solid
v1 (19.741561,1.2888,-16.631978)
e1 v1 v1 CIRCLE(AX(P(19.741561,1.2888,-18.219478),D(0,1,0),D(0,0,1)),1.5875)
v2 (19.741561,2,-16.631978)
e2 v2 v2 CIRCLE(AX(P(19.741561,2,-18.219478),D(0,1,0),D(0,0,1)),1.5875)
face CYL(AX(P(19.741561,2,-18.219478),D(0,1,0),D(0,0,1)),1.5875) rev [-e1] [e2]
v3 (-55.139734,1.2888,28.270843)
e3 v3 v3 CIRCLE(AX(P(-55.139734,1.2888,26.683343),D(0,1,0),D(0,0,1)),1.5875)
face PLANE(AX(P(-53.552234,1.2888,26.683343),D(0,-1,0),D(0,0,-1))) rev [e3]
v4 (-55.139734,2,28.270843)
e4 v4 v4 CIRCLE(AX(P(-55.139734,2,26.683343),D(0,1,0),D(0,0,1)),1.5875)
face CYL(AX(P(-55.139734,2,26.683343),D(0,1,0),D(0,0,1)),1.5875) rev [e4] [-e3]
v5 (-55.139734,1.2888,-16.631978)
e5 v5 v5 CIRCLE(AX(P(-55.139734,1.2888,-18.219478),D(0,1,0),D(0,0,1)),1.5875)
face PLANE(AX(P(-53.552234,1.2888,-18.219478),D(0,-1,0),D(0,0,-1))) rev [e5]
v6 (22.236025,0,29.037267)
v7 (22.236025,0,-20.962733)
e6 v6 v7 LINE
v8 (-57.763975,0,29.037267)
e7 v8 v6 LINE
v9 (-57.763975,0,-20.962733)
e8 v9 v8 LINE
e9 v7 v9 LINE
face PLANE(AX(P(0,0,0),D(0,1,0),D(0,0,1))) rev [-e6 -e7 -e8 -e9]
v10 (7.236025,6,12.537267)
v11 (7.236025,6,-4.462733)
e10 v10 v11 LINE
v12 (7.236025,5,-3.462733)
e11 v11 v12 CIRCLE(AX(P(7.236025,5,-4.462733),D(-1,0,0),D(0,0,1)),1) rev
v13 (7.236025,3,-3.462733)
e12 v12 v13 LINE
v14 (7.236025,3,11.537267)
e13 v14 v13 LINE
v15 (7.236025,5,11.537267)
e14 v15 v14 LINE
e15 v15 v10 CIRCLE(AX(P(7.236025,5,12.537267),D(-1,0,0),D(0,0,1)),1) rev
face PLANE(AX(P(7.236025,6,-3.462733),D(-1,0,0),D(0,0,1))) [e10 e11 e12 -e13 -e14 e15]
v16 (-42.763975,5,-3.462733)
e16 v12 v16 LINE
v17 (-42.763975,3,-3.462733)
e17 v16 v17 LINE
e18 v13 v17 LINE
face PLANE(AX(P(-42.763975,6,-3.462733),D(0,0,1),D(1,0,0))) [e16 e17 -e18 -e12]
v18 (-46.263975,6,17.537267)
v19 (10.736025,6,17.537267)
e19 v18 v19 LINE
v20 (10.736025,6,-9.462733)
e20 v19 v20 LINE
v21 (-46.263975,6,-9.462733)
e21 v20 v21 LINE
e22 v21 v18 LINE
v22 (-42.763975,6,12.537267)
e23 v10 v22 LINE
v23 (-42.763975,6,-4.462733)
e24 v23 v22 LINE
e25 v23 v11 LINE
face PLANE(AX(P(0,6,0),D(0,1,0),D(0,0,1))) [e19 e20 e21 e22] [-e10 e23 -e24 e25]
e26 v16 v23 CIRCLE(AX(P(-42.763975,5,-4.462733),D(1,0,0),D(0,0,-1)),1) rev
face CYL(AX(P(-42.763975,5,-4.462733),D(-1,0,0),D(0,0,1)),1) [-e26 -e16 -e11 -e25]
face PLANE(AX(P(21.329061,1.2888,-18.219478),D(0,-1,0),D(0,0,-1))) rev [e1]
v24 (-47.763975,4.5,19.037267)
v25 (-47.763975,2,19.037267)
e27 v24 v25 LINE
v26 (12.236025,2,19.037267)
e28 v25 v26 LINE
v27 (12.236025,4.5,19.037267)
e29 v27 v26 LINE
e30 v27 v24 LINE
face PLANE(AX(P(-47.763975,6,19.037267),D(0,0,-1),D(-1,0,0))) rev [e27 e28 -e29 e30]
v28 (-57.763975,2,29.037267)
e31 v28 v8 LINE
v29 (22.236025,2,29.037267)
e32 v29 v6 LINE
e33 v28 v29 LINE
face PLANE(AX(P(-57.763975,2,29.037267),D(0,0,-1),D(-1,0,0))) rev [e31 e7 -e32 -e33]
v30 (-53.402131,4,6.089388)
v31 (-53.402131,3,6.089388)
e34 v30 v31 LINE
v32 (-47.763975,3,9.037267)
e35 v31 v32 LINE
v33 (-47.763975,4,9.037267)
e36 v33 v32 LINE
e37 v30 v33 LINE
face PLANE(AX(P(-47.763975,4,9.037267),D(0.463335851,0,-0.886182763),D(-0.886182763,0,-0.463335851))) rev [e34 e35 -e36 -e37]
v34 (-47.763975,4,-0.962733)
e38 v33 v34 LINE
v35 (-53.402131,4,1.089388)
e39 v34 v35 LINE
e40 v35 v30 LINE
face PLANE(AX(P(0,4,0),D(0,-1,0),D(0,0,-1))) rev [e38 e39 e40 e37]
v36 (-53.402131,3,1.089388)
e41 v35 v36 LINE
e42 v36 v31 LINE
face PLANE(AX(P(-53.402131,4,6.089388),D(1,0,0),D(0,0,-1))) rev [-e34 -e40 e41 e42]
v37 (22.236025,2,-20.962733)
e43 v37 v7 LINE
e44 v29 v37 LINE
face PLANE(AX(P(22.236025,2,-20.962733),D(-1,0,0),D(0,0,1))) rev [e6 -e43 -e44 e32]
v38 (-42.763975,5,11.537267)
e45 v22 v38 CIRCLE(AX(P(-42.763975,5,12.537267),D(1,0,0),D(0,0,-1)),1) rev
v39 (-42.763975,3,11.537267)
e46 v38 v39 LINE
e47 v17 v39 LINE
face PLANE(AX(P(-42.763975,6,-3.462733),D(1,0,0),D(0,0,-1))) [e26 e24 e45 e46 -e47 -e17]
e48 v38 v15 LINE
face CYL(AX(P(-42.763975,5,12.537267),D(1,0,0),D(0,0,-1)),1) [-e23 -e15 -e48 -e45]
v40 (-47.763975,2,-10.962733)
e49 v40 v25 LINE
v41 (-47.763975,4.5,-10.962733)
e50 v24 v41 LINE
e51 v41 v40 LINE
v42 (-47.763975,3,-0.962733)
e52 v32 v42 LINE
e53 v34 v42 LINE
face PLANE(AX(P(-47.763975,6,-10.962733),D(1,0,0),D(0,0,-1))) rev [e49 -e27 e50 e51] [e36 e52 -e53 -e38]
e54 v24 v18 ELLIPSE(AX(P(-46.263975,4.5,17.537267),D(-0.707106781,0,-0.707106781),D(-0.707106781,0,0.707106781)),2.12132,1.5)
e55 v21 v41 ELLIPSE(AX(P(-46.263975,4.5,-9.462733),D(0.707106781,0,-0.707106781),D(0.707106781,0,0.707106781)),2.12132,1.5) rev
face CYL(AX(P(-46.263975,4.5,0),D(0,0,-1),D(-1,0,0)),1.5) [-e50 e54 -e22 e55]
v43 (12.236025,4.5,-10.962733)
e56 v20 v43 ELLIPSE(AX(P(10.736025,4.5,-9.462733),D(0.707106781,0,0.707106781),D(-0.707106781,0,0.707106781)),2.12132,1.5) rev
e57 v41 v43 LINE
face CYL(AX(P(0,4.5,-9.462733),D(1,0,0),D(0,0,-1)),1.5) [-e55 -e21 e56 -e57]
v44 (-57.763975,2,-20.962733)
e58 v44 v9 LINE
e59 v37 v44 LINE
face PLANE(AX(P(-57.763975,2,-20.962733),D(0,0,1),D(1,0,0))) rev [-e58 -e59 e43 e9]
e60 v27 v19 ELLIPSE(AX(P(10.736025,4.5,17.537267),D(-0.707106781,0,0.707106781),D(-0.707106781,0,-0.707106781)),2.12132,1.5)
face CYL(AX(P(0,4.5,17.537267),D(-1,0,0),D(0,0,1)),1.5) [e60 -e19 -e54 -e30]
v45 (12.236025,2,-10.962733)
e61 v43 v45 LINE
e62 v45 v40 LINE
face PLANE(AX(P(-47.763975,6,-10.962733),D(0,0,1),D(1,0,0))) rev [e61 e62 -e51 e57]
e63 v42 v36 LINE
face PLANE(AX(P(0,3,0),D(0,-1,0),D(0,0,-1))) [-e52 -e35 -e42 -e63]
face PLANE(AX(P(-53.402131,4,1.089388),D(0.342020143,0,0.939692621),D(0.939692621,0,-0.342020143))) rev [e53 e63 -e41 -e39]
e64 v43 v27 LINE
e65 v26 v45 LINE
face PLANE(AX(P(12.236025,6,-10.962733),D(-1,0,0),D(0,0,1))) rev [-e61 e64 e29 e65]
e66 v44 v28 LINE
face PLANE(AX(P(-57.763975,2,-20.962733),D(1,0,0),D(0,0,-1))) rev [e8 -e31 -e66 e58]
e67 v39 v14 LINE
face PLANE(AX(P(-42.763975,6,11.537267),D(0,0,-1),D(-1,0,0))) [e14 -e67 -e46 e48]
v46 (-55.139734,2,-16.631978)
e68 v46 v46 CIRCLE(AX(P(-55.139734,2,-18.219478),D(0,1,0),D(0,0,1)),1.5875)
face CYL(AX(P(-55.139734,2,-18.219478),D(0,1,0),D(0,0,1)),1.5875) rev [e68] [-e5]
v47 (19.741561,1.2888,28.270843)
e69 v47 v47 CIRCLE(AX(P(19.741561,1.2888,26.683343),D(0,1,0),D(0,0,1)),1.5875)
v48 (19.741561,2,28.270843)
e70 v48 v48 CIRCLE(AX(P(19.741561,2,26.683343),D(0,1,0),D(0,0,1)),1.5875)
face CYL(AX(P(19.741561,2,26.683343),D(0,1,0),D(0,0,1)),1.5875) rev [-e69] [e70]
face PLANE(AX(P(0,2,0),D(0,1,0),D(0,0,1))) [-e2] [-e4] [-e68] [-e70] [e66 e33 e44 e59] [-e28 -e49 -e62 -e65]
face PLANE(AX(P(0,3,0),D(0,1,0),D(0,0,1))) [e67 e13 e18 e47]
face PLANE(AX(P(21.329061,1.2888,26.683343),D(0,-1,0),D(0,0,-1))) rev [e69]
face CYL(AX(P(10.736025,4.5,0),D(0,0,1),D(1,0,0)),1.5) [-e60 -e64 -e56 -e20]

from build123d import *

# Parameters (mm, degrees)
SKETCH1_W               = 80
SKETCH1_H               = 50
BOSS_EXTRUDE1_DEPTH     = 2
SKETCH2_W               = 60
SKETCH2_H               = 30
SKETCH2_W_2             = 50
SKETCH2_H_2             = 15
BOSS_EXTRUDE4_DEPTH     = 4
SKETCH3_W               = 50
SKETCH3_H               = 15
BOSS_EXTRUDE5_DEPTH     = 1
BOSS_EXTRUDE6_DEPTH     = 1
FILLET2_R               = 1
FILLET3_R               = 1.5
ADVANCEDHOLE1_START     = 1.2888
ADVANCEDHOLE1_OUTLINE_R = 1.5875
ADVANCEDHOLE1_DEPTH     = 0.7112


# Read off the part's stored shape, not the designer's step: AdvancedHole1
with BuildPart() as part:
    # Sketch1 → Boss-Extrude1 (new body)
    with BuildSketch(Plane(origin=(0, 0, 0), x_dir=(1, 0, 0), z_dir=(0, 1, 0))):
        with Locations((-17.763975155, -4.037267081)):
            Rectangle(SKETCH1_W, SKETCH1_H)
    extrude(amount=BOSS_EXTRUDE1_DEPTH)

    # Sketch2 → Boss-Extrude4 (add)
    with BuildSketch(Plane(origin=(0, 2, 0), x_dir=(1, 0, 0), z_dir=(0, 1, 0))):
        with Locations((-17.763975155, -4.037267081)):
            Rectangle(SKETCH2_W, SKETCH2_H)
        with Locations((-17.763975155, -4.037267081)):
            Rectangle(SKETCH2_W_2, SKETCH2_H_2, mode=Mode.SUBTRACT)
    extrude(amount=BOSS_EXTRUDE4_DEPTH)

    # Sketch3 → Boss-Extrude5 (add)
    with BuildSketch(Plane(origin=(0, 2, 0), x_dir=(1, 0, 0), z_dir=(0, 1, 0))):
        with Locations((-17.763975155, -4.037267081)):
            Rectangle(SKETCH3_W, SKETCH3_H)
    extrude(amount=BOSS_EXTRUDE5_DEPTH)

    # Sketch4 → Boss-Extrude6 (add)
    with BuildSketch(Plane(origin=(0, 3, 0), x_dir=(1, 0, 0), z_dir=(0, 1, 0))):
        Polygon((-47.763975155, 0.962732919), (-47.763975155, -9.037267081), (-53.40213088, -6.089387941), (-53.40213088, -1.089387941), align=None)
    extrude(amount=BOSS_EXTRUDE6_DEPTH)

    # Fillet2
    fillet2_edges = [part.edges().sort_by_distance(p)[0] for p in [
        (-17.763975155, 6, 11.537267081),
        (-17.763975155, 6, -3.462732919),
    ]]
    fillet(fillet2_edges, radius=FILLET2_R)

    # Fillet3
    fillet3_edges = [part.edges().sort_by_distance(p)[0] for p in [
        (-47.763975155, 6, 4.037267081),
        (-17.763975155, 6, 19.037267081),
        (12.236024845, 6, 4.037267081),
        (-17.763975155, 6, -10.962732919),
    ]]
    fillet(fillet3_edges, radius=FILLET3_R)

    # AdvancedHole1 outline → AdvancedHole1 (cut)
    with BuildSketch(Plane(origin=(0, 0, 0), x_dir=(1, 0, 0), z_dir=(0, 1, 0)).offset(ADVANCEDHOLE1_START)):
        with Locations((19.741560812, -26.683343296)):
            Circle(ADVANCEDHOLE1_OUTLINE_R)
        with Locations((-55.139734181, -26.683343296)):
            Circle(ADVANCEDHOLE1_OUTLINE_R)
        with Locations((19.741560812, 18.219478311)):
            Circle(ADVANCEDHOLE1_OUTLINE_R)
        with Locations((-55.139734181, 18.219478311)):
            Circle(ADVANCEDHOLE1_OUTLINE_R)
    extrude(amount=ADVANCEDHOLE1_DEPTH, mode=Mode.SUBTRACT)


solid = part.part
